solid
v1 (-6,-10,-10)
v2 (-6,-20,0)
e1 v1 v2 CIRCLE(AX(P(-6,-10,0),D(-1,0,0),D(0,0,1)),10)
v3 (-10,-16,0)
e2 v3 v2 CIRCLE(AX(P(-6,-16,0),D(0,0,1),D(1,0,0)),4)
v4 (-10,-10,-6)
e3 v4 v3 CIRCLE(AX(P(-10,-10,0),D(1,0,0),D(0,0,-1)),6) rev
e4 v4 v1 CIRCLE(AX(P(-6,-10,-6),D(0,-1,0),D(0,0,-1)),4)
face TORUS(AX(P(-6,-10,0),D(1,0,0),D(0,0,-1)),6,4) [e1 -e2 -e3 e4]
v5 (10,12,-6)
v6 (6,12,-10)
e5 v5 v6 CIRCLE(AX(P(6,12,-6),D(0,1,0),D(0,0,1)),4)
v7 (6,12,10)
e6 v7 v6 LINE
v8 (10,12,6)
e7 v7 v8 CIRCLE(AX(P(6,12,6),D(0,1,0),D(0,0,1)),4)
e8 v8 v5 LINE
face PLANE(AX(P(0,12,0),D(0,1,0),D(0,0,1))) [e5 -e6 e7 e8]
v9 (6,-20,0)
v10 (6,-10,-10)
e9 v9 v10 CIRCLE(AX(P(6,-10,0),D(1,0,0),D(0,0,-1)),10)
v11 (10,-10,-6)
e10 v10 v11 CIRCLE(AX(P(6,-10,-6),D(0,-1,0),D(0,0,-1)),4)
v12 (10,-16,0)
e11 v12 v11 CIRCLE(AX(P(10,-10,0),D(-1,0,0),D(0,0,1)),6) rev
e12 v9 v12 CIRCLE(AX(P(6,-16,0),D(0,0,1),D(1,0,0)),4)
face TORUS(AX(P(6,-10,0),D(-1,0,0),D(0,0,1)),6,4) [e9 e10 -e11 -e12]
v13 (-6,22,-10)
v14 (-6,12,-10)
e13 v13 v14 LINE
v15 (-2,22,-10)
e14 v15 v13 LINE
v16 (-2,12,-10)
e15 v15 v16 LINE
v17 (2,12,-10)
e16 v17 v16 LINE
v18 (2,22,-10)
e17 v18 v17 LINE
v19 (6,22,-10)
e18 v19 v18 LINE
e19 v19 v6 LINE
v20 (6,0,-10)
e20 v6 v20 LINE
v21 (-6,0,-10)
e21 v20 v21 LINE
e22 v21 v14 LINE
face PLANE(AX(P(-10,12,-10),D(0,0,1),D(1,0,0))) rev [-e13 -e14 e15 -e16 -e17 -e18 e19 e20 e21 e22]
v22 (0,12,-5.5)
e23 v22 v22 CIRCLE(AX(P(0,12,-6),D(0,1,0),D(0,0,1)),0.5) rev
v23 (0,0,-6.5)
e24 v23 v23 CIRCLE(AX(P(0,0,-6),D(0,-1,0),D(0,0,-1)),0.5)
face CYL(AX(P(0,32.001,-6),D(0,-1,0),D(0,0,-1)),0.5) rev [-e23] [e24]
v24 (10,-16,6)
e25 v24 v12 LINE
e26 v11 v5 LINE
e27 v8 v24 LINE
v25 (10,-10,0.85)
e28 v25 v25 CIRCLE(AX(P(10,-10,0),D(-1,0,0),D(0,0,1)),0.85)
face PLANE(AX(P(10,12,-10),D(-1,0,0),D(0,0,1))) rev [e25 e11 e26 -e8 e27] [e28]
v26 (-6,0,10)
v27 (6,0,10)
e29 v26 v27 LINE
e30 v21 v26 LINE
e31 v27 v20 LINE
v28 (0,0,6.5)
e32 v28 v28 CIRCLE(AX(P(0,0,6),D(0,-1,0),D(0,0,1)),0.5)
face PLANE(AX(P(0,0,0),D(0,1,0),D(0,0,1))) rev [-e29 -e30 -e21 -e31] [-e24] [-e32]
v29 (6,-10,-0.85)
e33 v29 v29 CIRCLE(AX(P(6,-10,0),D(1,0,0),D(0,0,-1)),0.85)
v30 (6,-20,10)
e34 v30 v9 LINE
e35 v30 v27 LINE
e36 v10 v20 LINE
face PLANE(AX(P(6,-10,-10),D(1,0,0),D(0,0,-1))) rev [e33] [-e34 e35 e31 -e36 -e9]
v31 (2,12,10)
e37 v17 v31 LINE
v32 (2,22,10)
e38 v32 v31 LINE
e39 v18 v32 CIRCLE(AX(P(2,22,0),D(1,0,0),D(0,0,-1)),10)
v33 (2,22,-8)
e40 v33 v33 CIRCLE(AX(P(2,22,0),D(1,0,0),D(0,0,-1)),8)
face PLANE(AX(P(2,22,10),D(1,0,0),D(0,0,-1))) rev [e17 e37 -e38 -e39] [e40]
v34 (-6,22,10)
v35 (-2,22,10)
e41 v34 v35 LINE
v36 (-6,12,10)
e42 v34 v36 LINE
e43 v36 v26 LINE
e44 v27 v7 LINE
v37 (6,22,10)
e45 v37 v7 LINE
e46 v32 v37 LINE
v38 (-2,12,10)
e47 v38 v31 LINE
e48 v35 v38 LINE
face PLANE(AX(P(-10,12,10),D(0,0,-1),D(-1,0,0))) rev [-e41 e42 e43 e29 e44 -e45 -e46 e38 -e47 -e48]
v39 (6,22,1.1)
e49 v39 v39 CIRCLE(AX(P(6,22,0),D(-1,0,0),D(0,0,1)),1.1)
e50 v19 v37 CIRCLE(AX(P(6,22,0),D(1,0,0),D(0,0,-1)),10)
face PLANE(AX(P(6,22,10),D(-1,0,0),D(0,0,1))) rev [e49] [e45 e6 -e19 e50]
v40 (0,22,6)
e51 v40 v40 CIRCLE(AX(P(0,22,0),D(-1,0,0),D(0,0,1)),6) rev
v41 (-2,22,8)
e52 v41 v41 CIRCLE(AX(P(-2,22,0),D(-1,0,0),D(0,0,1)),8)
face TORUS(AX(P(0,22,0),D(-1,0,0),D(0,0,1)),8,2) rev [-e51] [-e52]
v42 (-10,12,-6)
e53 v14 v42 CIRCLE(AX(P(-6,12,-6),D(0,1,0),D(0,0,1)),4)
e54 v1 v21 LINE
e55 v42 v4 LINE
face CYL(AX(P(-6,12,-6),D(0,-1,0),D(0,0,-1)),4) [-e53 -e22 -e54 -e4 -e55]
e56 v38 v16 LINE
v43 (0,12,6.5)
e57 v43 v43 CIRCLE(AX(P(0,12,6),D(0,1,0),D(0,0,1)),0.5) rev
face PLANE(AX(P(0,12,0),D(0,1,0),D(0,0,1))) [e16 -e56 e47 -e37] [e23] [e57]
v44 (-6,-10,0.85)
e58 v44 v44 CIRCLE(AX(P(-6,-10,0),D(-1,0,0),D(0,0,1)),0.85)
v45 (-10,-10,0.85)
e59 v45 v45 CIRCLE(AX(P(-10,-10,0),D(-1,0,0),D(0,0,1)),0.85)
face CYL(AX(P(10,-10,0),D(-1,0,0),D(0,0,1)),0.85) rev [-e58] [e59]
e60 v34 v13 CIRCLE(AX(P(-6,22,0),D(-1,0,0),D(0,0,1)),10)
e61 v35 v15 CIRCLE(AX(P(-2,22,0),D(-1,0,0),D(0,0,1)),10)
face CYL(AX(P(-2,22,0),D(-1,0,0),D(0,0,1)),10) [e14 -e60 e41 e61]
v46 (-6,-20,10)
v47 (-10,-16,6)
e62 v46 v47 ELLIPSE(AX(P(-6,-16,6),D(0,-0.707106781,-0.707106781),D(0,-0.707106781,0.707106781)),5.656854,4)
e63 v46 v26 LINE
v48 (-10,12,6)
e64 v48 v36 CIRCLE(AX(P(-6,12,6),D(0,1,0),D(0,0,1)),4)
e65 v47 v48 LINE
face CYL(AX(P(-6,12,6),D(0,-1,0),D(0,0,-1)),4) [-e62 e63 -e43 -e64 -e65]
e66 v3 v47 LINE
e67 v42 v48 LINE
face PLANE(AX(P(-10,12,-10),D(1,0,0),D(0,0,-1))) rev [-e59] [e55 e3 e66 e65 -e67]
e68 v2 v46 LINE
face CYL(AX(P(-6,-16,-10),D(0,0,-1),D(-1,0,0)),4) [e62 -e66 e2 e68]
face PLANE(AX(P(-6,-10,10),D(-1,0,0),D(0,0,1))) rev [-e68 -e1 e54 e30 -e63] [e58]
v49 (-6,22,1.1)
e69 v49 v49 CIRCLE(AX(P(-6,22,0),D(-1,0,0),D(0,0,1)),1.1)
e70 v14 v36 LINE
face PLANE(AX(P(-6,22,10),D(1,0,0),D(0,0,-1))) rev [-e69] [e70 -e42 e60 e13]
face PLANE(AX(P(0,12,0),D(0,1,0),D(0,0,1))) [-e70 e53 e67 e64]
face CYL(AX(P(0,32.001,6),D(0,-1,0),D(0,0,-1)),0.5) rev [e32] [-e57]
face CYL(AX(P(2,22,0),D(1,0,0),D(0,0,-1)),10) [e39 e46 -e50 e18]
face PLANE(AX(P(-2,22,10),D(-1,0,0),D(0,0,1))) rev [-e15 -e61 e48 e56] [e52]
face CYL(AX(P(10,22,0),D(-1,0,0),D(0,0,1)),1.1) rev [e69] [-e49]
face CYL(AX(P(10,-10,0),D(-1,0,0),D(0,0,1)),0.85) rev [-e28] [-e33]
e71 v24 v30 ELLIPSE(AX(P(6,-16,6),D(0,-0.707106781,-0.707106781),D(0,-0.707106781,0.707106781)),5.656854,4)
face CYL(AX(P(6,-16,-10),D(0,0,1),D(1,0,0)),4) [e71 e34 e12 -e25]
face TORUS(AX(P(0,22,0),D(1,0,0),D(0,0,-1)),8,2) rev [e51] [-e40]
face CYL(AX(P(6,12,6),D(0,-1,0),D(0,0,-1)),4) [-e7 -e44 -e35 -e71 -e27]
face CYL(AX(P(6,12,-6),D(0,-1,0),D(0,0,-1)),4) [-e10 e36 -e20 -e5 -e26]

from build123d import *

# Parameters (mm, degrees)
SKETCH1_W           = 20
SKETCH1_H           = 20
BOSS_EXTRUDE1_DEPTH = 12
SKETCH4_W           = 4
SKETCH4_H           = 20
BOSS_EXTRUDE2_DEPTH = 10
BOSS_EXTRUDE3_DEPTH = 4
BOSS_EXTRUDE4_START = -4
BOSS_EXTRUDE4_DEPTH = 4
SKETCH7_R           = 0.85
CUT_EXTRUDE1_DEPTH  = 31
FILLET1_R           = 4
SKETCH8_W           = 4
SKETCH8_H           = 20
BOSS_EXTRUDE5_DEPTH = 10
SKETCH9_R           = 10
BOSS_EXTRUDE6_DEPTH = 4
BOSS_EXTRUDE7_START = -4
SKETCH10_R          = 10
BOSS_EXTRUDE7_DEPTH = 4
SKETCH12_R          = 1.1
CUT_EXTRUDE2_DEPTH  = 38.148351242
SKETCH13_R          = 6
BOSS_EXTRUDE8_DEPTH = 4
SKETCH14_R          = 1.1
CUT_EXTRUDE3_DEPTH  = 4
FILLET2_R           = 2
CUT_EXTRUDE4_REACH  = 36.986
SKETCH16_R          = 0.5


with BuildPart() as part:
    # Sketch1 → Boss-Extrude1 (new body)
    with BuildSketch(Plane(origin=(0, 0, 0), x_dir=(1, 0, 0), z_dir=(0, 1, 0))):
        Rectangle(SKETCH1_W, SKETCH1_H)
    extrude(amount=BOSS_EXTRUDE1_DEPTH)

    # Sketch4 → Boss-Extrude2 (add)
    with BuildSketch(Plane.XZ):
        with Locations((-8, 0)):
            Rectangle(SKETCH4_W, SKETCH4_H)
        with Locations((8, 0)):
            Rectangle(SKETCH4_W, SKETCH4_H)
    extrude(amount=BOSS_EXTRUDE2_DEPTH)

    # Sketch5 → Boss-Extrude3 (add)
    with BuildSketch(Plane.ZY.offset(10)):
        with BuildLine():
            Line((0, -20), (10, -20))
            Line((10, -20), (10, -10))
            ThreePointArc((10, -10), (-7.071067812, -2.928932188), (0, -20))
        make_face()
    extrude(amount=-BOSS_EXTRUDE3_DEPTH)

    # Sketch6 → Boss-Extrude4 (add)
    with BuildSketch(Plane(origin=(10, 0, 0), x_dir=(0, 0, -1), z_dir=(1, 0, 0)).offset(BOSS_EXTRUDE4_START)):
        with BuildLine():
            Line((0, -20), (-10, -20))
            Line((-10, -20), (-10, -10))
            ThreePointArc((-10, -10), (7.071067812, -2.928932188), (0, -20))
        make_face()
    extrude(amount=BOSS_EXTRUDE4_DEPTH)

    # Sketch7 → Cut-Extrude1 (cut, through all)
    with BuildSketch(Plane.ZY.offset(10)):
        with Locations((0, -10)):
            Circle(SKETCH7_R)
    extrude(amount=-CUT_EXTRUDE1_DEPTH, mode=Mode.SUBTRACT)

    # Fillet1
    fillet1_edges = [part.edges().sort_by_distance(p)[0] for p in [
        (-10, -4, 10),
        (-10, -17.071067812, -7.071067812),
        (10, -4, 10),
        (10, -17.071067812, -7.071067812),
        (-10, 1, -10),
        (10, 1, -10),
        (10, -20, 5),
        (-10, -20, 5),
    ]]
    fillet(fillet1_edges, radius=FILLET1_R - 0.0001)  # a hair under: the kernel refuses the full size

    # Sketch8 → Boss-Extrude5 (add)
    with BuildSketch(Plane(origin=(0, 12, 0), x_dir=(1, 0, 0), z_dir=(0, 1, 0))):
        with Locations((4, 0)):
            Rectangle(SKETCH8_W, SKETCH8_H)
        with Locations((-4, 0)):
            Rectangle(SKETCH8_W, SKETCH8_H)
    extrude(amount=BOSS_EXTRUDE5_DEPTH)

    # Sketch9 → Boss-Extrude6 (add)
    with BuildSketch(Plane(origin=(6, 0, 0), x_dir=(0, 0, -1), z_dir=(1, 0, 0))):
        with Locations((0, 22)):
            Circle(SKETCH9_R)
    extrude(amount=-BOSS_EXTRUDE6_DEPTH)

    # Sketch10 → Boss-Extrude7 (add)
    with BuildSketch(Plane.ZY.offset(6).offset(BOSS_EXTRUDE7_START)):
        with Locations((0, 22)):
            Circle(SKETCH10_R)
    extrude(amount=BOSS_EXTRUDE7_DEPTH)

    # Sketch12 → Cut-Extrude2 (cut, through all)
    with BuildSketch(Plane.ZY.offset(6)):
        with Locations((0, 22)):
            Circle(SKETCH12_R)
    extrude(amount=-CUT_EXTRUDE2_DEPTH, mode=Mode.SUBTRACT)

    # Sketch13 → Boss-Extrude8 (add)
    with BuildSketch(Plane(origin=(-2, 0, 0), x_dir=(0, 0, -1), z_dir=(1, 0, 0))):
        with Locations(Location((0, 22, 0), (0, 0, 180))):
            Circle(SKETCH13_R)
    extrude(amount=BOSS_EXTRUDE8_DEPTH)

    # Sketch14 → Cut-Extrude3 (cut)
    with BuildSketch(Plane(origin=(-2, 0, 0), x_dir=(0, 0, -1), z_dir=(1, 0, 0))):
        with Locations(Location((0, 22, 0), (0, 0, 180))):
            Circle(SKETCH14_R)
    extrude(amount=CUT_EXTRUDE3_DEPTH, mode=Mode.SUBTRACT)

    # Fillet2
    fillet2_edges = [part.edges().sort_by_distance(p)[0] for p in [
        (-2, 22, -6),
        (2, 22, -6),
    ]]
    fillet(fillet2_edges, radius=FILLET2_R - 0.0001)  # a hair under: the kernel refuses the full size

    # Sketch16 → Cut-Extrude4 (cut, up to next)
    with BuildSketch(Plane.XZ, mode=Mode.PRIVATE) as cut_extrude4_sk1:
        with Locations(Location((0, -6, 0), (0, 0, 270))):
            Circle(SKETCH16_R)
    cut_extrude4_tool1 = extrude(cut_extrude4_sk1.sketch, amount=-CUT_EXTRUDE4_REACH, mode=Mode.PRIVATE) & part.part
    # Sketch16 → Cut-Extrude4 (cut, up to next)
    with BuildSketch(Plane.XZ, mode=Mode.PRIVATE) as cut_extrude4_sk2:
        with Locations(Location((0, 6, 0), (0, 0, 90))):
            Circle(SKETCH16_R)
    cut_extrude4_tool2 = extrude(cut_extrude4_sk2.sketch, amount=-CUT_EXTRUDE4_REACH, mode=Mode.PRIVATE) & part.part
    add(cut_extrude4_tool1.solids().sort_by_distance((0, 0, -6))[0], mode=Mode.SUBTRACT)
    add(cut_extrude4_tool2.solids().sort_by_distance((0, 0, 6))[0], mode=Mode.SUBTRACT)


solid = part.part
